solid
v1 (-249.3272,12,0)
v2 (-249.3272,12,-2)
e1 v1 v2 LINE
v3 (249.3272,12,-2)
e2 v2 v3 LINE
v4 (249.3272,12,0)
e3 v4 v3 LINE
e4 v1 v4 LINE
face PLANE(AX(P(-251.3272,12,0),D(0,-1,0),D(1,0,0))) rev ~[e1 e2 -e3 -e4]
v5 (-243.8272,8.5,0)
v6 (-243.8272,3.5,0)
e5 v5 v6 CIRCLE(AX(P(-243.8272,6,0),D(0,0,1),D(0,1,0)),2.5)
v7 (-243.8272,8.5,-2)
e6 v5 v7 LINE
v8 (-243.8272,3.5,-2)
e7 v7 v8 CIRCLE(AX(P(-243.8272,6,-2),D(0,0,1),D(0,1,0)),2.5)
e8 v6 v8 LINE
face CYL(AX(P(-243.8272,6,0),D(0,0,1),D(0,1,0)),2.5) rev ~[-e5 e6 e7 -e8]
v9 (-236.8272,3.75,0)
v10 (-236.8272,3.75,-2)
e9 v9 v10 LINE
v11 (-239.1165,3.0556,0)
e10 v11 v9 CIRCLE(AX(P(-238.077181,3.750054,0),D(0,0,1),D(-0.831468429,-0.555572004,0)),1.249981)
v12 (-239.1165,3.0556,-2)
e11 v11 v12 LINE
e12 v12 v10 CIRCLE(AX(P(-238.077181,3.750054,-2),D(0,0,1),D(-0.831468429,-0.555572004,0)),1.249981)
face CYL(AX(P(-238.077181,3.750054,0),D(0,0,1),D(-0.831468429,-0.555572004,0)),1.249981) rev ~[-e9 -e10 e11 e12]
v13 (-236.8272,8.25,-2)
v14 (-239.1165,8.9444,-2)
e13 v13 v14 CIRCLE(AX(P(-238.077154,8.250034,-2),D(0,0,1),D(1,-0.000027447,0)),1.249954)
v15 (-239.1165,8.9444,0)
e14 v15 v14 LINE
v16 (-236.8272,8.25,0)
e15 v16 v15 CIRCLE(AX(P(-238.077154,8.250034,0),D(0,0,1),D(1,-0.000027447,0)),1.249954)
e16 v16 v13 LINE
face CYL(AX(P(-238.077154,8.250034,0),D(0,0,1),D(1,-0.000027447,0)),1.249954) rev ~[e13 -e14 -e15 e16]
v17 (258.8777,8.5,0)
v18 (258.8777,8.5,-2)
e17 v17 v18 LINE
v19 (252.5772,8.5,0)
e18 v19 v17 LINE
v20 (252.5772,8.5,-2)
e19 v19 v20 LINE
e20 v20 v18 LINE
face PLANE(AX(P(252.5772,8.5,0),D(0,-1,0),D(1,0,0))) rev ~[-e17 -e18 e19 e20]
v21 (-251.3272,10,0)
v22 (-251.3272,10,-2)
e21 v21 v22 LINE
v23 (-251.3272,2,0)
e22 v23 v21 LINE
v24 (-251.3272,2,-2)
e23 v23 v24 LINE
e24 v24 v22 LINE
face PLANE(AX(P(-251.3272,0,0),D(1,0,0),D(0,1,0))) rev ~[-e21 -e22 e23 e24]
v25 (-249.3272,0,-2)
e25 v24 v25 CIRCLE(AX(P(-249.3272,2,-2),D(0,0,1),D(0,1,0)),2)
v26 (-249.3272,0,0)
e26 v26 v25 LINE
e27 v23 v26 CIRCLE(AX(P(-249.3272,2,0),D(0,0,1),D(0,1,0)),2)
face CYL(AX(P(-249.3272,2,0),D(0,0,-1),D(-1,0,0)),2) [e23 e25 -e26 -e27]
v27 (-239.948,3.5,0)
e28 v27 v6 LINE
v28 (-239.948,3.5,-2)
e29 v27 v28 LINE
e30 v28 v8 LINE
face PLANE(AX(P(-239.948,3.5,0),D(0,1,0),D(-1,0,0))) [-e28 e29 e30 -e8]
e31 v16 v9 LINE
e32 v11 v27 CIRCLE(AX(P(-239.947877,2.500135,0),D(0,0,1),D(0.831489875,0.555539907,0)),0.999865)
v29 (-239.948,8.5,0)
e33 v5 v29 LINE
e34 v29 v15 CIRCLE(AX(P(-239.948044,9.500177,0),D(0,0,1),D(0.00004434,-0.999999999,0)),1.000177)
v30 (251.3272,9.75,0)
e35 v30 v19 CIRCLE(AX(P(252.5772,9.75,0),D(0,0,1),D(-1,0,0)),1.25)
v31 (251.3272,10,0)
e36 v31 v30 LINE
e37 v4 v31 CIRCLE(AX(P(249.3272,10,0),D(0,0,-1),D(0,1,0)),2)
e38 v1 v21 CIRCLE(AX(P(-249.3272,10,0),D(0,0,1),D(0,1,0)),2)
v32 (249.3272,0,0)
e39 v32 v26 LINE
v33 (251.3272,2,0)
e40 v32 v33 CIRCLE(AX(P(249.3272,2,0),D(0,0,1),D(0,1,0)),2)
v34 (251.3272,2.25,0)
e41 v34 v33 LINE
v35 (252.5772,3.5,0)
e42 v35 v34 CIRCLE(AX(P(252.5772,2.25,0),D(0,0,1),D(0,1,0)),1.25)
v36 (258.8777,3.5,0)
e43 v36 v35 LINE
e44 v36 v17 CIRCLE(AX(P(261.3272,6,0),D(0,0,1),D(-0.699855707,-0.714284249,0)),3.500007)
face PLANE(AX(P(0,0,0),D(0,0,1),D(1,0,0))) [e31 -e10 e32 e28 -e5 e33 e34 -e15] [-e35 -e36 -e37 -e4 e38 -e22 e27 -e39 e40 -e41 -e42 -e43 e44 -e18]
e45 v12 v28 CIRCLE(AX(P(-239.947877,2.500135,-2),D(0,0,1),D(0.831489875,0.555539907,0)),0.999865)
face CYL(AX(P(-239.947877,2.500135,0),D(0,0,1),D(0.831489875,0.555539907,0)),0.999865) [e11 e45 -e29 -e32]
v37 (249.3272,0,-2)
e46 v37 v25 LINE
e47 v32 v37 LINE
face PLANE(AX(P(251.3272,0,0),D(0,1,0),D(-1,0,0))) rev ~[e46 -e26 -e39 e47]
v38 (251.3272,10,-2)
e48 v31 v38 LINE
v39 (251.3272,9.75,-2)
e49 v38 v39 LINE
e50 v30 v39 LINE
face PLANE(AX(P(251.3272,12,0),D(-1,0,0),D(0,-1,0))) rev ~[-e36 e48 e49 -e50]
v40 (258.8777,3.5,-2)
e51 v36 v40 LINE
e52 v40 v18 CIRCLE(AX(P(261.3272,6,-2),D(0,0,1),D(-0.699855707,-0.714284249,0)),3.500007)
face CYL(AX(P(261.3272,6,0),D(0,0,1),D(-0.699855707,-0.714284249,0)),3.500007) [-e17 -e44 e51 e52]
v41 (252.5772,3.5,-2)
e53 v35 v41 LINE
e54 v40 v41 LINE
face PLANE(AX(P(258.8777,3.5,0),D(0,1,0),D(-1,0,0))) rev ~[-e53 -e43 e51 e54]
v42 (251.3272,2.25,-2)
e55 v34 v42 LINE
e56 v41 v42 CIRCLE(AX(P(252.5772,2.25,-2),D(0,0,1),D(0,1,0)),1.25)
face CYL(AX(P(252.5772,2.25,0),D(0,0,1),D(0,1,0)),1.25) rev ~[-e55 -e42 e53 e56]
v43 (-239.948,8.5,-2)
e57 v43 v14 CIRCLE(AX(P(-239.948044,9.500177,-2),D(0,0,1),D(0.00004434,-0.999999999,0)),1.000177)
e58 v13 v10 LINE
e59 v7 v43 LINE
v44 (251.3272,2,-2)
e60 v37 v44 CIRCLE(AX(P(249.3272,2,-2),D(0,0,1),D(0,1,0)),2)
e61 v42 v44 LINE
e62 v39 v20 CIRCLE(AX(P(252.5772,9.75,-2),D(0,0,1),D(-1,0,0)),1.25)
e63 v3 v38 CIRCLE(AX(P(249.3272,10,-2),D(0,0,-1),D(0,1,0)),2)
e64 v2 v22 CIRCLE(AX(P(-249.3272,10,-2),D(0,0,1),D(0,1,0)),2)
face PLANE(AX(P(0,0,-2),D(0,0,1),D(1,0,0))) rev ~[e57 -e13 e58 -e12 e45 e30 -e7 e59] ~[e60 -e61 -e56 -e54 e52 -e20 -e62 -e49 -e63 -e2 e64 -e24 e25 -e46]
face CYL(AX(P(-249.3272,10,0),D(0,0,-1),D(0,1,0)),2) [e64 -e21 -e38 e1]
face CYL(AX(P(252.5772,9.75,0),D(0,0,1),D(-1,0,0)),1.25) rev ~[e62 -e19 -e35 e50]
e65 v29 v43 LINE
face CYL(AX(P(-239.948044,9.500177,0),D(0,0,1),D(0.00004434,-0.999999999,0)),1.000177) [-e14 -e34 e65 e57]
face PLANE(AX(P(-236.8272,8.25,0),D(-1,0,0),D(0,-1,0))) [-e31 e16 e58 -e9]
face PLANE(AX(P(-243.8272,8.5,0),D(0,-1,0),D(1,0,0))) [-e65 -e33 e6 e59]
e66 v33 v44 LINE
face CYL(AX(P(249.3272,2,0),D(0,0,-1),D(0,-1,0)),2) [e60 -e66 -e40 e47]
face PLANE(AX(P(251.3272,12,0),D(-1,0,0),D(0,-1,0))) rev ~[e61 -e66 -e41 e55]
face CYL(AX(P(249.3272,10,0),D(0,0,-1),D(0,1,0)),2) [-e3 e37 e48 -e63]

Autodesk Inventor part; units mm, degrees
ref_plane "YZ Plane" through (0, 0, 0) normal (1, 0, 0) x (0, 1, 0)
ref_plane "XZ Plane" through (0, 0, 0) normal (0, 1, 0) x (-1, 0, 0)
ref_plane "XY Plane" through (0, 0, 0) normal (0, 0, 1) x (1, 0, 0)
sketch "Эскиз1" plane through (0, 0, 0) normal (0, 0, 1) x (1, 0, 0)
  line L0 (-251.3272, 12) -> (251.3272, 12)
  line L1 (251.3272, 12) -> (251.3272, 0)
  line L2 (251.3272, 0) -> (-251.3272, 0)
  line L3 (-251.3272, 0) -> (-251.3272, 12)
  point P0 (0, 0)
  point P1 (0, 0)
  dimension "d0" = 12
  dimension "d1" = 502.6544
extrude "Выдавливание1" add sketch "Эскиз1" against normal blind 2
sketch "Эскиз4" plane through (0, 0, 0) normal (0, 0, 1) x (1, 0, 0)
  arc A0 (-243.8272, 8.5) -> (-243.8272, 3.5) centre (-243.8272, 6) ccw projected
  line L0 (-243.8272, 8.5) -> (-239.948, 8.5) projected
  arc A1 (-239.948, 8.5) -> (-239.1165, 8.9444) centre (-239.948, 9.5) ccw projected
  arc A2 (-236.8272, 8.25) -> (-239.1165, 8.9444) centre (-238.0772, 8.25) ccw projected
  line L1 (-236.8272, 8.25) -> (-236.8272, 3.75) projected
  arc A3 (-239.1165, 3.0556) -> (-236.8272, 3.75) centre (-238.0772, 3.75) ccw projected
  arc A4 (-239.1165, 3.0556) -> (-239.948, 3.5) centre (-239.948, 2.5) ccw projected
  line L2 (-239.948, 3.5) -> (-243.8272, 3.5) projected
  arc A5 (217.9113, 0) -> (219.9113, 2) centre (217.9113, 2) ccw construction
  line L3 (219.9113, 2.25) -> (219.9113, 2) construction
  arc A6 (221.1613, 3.5) -> (219.9113, 2.25) centre (221.1613, 2.25) ccw construction
  line L4 (227.4618, 3.5) -> (221.1613, 3.5) construction
  arc A7 (227.4618, 3.5) -> (227.4618, 8.5) centre (229.9113, 6) ccw construction
  line L5 (221.1613, 8.5) -> (227.4618, 8.5) construction
  arc A8 (219.9113, 9.75) -> (221.1613, 8.5) centre (221.1613, 9.75) ccw construction
  line L6 (219.9113, 10) -> (219.9113, 9.75) construction
  arc A9 (219.9113, 10) -> (217.9113, 12) centre (217.9113, 10) ccw construction
  line L7 (-249.3272, 12) -> (217.9113, 12) construction
  arc A10 (-249.3272, 12) -> (-251.3272, 10) centre (-249.3272, 10) ccw construction
  line L8 (-251.3272, 2) -> (-251.3272, 10) construction
  arc A11 (-251.3272, 2) -> (-249.3272, 0) centre (-249.3272, 2) ccw construction
  line L9 (217.9113, 0) -> (-249.3272, 0) construction
  line L10 (252.5772, 8.5) -> (258.8777, 8.5) projected
  arc A12 (258.8777, 3.5) -> (258.8777, 8.5) centre (261.3272, 6) ccw projected
  line L11 (258.8777, 3.5) -> (252.5772, 3.5) projected
  arc A13 (252.5772, 3.5) -> (251.3272, 2.25) centre (252.5772, 2.25) ccw projected
  arc A14 (251.3272, 9.75) -> (252.5772, 8.5) centre (252.5772, 9.75) ccw projected
  line L12 (251.3272, 9.75) -> (251.3272, 2.25)
  line L13 (251.3272, 12) -> (251.3272, 0) construction
  point P0 (0, 0)
extrude "Выдавливание4" add sketch "Эскиз4" against normal up to surface (2 mm away) contours L10 A12 L11 A13 L12 A14
extrude "Выдавливание5" cut sketch "Эскиз4" against normal blind 10 contours L0 A1 A2 L1 A3 A4 L2 A0
fillet "Сопряжение2" radius 2 4 edges at (251.3272, 0, -1) (251.3272, 12, -1) (-251.3272, 0, -1) (-251.3272, 12, -1)
sketch "Эскиз2" plane through (0, 0, 0) normal (0, 0, 1) x (1, 0, 0)
  line L0 (-251.3272, 12) -> (251.3272, 12) projected
  line L1 (-251.3272, 0) -> (-251.3272, 12) projected
  line L2 (251.3272, 0) -> (-251.3272, 0) projected
  line L3 (251.3272, 12) -> (251.3272, 0) projected
  line L4 (0, 0) -> (0, 12)
properties part number "Пластина LED(New6)-развёртка"
